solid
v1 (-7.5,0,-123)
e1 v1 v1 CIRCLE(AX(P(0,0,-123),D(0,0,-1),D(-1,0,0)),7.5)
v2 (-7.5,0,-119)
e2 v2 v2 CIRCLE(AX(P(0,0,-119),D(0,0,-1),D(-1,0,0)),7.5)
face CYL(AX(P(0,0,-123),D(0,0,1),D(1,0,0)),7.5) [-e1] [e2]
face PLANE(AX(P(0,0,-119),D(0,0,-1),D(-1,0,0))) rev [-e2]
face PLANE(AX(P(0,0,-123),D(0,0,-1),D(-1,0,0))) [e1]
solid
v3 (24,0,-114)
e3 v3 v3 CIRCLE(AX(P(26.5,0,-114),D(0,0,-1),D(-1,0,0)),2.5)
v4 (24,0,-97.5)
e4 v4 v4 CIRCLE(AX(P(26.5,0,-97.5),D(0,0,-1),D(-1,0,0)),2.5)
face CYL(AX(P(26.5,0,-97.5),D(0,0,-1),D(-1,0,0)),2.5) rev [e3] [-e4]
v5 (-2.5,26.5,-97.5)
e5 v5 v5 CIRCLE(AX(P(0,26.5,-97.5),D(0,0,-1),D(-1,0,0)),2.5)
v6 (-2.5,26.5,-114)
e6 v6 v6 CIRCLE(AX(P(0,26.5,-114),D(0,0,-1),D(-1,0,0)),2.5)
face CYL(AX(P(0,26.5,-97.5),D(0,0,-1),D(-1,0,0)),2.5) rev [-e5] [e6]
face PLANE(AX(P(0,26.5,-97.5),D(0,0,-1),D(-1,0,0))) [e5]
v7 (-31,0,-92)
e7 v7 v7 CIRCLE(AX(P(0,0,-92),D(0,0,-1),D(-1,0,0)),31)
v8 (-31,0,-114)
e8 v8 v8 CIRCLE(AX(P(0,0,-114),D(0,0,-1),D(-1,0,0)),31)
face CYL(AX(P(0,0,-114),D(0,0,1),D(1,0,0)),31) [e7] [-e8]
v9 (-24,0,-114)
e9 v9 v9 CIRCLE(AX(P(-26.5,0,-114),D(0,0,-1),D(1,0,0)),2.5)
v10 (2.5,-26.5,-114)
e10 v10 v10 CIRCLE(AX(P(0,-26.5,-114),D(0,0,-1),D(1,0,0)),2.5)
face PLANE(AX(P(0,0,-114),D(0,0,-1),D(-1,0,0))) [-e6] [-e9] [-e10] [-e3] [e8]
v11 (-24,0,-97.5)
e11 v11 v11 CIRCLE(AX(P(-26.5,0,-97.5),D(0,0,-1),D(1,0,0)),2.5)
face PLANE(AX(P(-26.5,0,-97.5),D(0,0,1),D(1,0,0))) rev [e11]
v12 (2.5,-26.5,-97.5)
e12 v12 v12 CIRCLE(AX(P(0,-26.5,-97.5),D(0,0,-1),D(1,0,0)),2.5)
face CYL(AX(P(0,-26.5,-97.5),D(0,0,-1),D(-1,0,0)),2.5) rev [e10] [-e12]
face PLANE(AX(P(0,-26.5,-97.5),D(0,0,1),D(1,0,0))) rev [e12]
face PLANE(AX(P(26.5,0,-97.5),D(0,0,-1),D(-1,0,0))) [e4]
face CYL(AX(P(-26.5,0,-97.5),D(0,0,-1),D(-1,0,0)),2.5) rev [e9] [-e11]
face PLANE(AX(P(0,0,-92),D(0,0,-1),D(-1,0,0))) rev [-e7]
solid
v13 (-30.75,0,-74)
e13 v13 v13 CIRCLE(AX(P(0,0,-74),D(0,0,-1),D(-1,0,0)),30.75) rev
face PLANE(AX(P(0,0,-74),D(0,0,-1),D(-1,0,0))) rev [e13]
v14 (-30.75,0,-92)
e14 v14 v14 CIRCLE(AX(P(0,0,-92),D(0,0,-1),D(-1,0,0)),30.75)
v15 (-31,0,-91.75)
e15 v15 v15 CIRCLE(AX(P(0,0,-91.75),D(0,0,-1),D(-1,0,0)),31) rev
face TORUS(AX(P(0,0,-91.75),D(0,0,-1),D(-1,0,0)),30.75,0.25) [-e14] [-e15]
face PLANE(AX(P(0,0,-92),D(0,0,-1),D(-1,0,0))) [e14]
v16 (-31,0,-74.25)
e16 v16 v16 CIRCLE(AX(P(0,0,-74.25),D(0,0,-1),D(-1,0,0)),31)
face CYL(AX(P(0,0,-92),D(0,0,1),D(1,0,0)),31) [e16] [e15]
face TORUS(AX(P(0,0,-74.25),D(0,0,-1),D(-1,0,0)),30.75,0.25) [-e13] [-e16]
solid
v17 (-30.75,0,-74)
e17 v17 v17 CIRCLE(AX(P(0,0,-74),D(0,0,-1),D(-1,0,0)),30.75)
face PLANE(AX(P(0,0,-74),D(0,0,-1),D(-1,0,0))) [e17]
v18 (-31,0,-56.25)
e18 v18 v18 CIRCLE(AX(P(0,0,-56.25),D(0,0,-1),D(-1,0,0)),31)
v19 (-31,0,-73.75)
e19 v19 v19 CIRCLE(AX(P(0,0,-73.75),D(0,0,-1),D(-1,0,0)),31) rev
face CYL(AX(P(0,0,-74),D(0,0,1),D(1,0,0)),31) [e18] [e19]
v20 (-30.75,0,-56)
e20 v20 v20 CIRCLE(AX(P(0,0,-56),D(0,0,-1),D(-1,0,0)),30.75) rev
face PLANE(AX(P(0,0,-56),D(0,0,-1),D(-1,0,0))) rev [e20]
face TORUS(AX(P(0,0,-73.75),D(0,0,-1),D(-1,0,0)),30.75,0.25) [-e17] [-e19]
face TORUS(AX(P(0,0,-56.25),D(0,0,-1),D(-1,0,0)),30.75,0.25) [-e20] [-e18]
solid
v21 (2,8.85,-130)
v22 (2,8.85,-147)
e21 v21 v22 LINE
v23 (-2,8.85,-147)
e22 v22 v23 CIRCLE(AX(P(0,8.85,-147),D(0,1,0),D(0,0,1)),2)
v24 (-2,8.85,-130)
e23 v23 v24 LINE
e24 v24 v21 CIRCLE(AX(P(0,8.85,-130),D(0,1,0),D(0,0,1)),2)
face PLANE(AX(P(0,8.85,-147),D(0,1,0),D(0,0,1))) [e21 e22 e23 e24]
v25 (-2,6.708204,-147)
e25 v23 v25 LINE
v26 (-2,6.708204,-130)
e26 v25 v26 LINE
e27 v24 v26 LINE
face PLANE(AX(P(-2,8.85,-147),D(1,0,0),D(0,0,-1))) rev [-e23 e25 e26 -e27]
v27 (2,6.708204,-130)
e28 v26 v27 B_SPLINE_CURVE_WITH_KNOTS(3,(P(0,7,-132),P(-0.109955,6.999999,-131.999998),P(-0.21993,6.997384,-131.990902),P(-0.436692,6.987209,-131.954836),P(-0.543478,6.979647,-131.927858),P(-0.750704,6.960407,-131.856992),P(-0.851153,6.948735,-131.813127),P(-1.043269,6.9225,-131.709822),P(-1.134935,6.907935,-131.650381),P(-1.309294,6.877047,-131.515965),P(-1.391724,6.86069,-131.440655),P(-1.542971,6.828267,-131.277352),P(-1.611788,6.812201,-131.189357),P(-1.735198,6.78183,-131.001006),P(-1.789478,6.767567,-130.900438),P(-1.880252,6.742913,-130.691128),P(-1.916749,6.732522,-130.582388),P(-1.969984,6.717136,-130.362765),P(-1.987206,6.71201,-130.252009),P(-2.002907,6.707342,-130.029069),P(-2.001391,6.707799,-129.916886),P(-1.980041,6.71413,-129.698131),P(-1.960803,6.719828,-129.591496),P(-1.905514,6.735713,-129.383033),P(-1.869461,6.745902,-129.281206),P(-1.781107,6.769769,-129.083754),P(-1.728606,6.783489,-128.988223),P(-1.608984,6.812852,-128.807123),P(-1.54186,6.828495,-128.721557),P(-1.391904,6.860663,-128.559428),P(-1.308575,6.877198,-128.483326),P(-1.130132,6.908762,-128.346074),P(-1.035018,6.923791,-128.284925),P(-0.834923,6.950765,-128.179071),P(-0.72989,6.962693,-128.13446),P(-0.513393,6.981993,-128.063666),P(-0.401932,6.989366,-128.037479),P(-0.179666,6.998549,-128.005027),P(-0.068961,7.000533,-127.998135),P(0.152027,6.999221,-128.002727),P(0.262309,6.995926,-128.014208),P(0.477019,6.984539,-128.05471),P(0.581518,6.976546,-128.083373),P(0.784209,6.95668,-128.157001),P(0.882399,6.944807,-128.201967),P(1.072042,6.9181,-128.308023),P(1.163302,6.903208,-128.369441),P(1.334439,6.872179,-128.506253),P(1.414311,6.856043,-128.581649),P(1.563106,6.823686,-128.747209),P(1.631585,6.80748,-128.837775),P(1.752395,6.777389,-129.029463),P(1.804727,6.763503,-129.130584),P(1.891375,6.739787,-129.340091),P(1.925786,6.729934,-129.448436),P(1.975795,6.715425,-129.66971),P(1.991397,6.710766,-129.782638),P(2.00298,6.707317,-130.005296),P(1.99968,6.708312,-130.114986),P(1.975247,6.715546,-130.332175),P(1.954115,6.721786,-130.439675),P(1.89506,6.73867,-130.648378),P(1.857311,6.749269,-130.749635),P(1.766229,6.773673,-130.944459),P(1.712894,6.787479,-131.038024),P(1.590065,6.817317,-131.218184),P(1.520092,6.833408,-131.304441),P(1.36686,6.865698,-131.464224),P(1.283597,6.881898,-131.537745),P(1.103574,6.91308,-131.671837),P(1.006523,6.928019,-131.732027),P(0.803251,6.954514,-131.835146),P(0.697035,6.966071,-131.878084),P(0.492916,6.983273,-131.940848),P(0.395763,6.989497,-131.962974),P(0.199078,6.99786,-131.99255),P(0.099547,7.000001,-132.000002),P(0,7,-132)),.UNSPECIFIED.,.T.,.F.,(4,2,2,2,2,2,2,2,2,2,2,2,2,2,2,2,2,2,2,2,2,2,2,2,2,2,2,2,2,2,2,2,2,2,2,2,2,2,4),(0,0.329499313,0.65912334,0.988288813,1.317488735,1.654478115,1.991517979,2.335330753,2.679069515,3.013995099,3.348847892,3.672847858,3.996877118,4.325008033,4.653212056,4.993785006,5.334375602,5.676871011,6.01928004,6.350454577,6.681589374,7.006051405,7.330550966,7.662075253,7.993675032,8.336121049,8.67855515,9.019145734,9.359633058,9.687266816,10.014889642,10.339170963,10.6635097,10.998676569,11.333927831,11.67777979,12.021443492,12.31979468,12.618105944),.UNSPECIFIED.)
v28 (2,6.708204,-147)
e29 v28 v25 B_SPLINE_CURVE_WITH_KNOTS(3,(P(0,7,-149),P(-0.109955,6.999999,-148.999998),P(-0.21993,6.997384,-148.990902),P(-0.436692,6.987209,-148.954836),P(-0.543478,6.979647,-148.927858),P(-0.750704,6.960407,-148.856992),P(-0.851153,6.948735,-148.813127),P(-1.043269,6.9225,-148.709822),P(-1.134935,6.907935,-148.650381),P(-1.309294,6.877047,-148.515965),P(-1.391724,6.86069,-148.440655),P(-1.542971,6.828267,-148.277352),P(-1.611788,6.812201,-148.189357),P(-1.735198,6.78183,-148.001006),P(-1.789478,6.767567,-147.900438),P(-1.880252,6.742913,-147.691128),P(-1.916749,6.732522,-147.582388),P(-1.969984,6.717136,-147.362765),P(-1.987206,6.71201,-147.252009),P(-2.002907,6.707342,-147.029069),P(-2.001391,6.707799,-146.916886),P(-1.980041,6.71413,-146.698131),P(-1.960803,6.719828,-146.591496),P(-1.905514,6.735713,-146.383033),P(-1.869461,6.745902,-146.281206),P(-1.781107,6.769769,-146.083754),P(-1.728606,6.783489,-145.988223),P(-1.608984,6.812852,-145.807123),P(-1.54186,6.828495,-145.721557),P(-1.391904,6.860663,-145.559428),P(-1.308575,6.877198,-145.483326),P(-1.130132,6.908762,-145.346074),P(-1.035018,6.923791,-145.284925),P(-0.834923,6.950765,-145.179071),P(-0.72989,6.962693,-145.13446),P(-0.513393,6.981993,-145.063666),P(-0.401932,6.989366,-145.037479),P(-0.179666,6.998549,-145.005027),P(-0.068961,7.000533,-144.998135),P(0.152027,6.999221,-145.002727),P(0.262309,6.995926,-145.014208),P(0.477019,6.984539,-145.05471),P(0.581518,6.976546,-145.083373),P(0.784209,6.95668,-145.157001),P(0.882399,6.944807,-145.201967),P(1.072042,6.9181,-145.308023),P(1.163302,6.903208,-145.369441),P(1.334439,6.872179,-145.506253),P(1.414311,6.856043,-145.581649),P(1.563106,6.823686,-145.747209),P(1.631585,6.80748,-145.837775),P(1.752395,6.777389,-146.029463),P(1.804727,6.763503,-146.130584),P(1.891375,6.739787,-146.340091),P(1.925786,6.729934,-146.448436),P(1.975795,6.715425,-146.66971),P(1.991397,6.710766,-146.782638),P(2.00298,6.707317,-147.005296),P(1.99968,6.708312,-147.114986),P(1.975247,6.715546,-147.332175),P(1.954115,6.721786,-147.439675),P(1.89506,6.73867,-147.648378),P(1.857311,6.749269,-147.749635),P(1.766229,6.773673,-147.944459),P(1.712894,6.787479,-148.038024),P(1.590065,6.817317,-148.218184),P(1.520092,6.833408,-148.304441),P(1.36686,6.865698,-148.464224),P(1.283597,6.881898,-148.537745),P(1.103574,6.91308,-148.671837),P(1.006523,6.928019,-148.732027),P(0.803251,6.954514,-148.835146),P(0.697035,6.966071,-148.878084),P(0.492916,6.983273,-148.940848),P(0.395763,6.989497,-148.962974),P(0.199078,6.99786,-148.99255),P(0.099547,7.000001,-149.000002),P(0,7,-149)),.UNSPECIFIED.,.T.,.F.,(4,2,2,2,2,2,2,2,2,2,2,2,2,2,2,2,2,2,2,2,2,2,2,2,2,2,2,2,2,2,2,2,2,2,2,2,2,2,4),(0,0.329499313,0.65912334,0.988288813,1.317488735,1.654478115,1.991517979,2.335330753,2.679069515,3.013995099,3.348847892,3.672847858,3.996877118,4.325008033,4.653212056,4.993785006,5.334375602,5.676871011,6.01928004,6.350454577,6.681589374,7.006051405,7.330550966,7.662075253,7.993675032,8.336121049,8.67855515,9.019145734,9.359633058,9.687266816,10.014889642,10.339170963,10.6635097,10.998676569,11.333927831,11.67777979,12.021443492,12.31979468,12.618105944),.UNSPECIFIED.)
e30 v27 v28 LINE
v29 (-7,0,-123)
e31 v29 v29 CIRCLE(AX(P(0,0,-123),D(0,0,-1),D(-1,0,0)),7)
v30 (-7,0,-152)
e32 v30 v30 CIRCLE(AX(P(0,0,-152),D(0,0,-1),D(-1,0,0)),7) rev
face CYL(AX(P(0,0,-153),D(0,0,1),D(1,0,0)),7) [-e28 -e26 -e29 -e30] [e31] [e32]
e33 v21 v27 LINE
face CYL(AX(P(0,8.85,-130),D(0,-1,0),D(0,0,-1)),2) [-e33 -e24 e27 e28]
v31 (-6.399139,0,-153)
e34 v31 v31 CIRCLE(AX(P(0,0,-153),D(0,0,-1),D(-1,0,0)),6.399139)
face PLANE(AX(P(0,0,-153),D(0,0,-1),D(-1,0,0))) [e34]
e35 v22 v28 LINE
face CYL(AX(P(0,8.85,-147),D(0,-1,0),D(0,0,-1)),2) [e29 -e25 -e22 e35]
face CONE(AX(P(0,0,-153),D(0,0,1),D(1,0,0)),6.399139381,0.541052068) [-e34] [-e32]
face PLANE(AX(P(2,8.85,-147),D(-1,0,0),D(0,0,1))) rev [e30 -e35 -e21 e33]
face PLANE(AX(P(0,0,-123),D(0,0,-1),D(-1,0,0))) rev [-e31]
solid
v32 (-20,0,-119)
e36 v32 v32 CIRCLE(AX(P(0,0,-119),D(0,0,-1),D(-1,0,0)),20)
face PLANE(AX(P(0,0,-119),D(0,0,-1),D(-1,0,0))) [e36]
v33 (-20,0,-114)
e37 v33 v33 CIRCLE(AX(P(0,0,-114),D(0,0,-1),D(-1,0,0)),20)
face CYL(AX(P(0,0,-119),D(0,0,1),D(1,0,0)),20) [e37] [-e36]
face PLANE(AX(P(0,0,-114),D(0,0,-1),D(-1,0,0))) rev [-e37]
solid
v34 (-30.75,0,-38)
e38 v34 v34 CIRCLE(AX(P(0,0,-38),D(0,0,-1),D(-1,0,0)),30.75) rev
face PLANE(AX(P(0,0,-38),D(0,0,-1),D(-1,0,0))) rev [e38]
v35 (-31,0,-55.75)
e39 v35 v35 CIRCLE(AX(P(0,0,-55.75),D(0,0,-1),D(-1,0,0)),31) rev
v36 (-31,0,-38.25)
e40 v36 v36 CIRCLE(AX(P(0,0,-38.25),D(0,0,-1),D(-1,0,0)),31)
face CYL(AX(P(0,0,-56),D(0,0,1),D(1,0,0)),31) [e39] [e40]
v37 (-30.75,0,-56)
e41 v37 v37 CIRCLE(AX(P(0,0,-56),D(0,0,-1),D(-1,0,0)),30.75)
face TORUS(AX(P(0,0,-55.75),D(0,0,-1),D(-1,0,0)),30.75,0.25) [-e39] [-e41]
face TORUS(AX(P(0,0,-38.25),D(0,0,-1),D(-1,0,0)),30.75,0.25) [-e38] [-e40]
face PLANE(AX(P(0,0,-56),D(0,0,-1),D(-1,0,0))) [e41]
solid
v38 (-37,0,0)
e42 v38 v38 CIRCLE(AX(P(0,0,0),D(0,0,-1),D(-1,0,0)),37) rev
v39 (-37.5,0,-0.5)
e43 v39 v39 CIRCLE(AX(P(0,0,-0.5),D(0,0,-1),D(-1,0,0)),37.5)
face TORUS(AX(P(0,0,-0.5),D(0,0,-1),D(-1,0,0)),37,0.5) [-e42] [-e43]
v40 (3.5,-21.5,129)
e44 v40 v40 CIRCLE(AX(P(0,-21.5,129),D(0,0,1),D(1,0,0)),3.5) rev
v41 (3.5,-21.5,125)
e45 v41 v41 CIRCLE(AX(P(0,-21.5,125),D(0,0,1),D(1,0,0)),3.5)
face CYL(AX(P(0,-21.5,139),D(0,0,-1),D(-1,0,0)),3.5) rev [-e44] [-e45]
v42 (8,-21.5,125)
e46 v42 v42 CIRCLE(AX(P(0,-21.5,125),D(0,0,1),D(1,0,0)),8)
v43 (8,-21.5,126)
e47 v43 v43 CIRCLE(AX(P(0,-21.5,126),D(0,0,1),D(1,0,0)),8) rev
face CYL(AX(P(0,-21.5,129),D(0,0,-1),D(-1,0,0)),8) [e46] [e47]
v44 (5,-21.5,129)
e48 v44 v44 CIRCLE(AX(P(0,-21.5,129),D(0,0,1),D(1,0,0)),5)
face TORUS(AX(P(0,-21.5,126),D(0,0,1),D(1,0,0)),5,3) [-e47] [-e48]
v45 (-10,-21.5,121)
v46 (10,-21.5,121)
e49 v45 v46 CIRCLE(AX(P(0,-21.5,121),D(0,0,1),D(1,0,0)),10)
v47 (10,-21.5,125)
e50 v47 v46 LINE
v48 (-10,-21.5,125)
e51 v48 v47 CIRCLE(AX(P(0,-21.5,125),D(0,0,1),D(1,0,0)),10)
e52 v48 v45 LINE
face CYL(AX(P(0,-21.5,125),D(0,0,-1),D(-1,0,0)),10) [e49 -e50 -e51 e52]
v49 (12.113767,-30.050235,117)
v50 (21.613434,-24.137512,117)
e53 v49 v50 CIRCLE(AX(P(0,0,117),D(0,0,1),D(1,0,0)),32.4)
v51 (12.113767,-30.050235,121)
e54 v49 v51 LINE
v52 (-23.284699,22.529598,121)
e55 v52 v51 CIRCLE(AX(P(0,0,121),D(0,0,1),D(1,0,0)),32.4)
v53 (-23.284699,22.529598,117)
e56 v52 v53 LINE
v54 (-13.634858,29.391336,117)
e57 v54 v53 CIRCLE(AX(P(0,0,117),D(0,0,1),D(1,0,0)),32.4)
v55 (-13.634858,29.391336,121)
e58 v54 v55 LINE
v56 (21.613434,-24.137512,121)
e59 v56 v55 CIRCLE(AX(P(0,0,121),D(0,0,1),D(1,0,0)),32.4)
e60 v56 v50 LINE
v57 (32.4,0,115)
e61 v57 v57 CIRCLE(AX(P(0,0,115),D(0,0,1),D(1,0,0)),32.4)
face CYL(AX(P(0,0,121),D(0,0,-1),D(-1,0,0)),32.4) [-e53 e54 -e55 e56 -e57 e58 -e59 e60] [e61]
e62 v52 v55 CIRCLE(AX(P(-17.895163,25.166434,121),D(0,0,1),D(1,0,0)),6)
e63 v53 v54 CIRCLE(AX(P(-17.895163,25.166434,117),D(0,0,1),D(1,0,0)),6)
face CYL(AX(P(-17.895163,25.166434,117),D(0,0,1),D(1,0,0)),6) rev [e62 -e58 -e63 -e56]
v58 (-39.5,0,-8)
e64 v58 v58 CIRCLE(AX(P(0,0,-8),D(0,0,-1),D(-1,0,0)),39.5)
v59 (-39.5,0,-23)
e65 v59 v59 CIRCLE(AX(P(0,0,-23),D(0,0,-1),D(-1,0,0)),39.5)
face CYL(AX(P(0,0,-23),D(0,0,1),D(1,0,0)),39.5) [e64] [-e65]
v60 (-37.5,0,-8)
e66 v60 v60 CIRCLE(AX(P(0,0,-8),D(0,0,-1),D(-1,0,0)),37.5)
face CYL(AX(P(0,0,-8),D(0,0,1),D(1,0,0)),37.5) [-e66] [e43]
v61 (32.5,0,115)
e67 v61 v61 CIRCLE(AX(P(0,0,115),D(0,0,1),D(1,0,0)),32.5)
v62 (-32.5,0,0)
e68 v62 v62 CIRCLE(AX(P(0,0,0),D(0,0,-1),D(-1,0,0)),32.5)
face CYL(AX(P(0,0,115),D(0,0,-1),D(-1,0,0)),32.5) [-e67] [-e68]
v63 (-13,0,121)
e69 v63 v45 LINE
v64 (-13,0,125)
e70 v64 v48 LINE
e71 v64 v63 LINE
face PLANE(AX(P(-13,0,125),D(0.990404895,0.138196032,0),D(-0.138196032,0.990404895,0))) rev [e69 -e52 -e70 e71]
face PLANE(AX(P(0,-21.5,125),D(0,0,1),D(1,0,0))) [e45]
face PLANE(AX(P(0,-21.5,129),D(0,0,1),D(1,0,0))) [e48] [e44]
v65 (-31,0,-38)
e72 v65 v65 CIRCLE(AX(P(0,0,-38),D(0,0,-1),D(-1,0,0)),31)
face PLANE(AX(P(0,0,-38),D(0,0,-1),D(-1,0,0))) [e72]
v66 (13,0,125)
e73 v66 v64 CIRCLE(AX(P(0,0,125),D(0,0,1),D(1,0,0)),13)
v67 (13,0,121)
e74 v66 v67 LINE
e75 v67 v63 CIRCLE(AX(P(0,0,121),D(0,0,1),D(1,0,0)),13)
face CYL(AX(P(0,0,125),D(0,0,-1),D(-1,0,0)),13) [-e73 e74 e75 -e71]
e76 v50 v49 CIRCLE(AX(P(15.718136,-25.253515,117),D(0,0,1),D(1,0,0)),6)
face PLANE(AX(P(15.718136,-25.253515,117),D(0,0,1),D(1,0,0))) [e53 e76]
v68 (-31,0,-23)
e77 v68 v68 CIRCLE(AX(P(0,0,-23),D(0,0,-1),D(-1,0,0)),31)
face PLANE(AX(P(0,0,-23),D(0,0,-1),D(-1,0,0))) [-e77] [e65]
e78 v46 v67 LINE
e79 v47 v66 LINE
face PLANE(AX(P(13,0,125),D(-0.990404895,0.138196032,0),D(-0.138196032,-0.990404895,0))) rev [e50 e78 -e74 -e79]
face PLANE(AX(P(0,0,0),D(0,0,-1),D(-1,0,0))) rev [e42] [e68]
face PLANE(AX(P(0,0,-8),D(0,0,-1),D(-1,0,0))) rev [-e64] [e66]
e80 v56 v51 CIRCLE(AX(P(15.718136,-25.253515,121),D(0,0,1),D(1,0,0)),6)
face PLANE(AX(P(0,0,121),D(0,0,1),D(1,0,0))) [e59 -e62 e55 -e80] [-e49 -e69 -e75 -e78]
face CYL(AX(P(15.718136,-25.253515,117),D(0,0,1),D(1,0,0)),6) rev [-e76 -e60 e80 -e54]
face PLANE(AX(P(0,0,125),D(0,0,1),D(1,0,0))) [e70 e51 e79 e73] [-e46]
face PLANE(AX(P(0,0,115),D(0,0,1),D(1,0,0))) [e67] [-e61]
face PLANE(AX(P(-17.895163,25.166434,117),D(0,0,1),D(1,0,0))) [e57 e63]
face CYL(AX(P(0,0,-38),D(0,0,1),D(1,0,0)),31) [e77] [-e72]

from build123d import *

# Parameters (mm, degrees)
SKETCH_1_R           = 32.5
EXTRUDE_1_DEPTH      = 115
SKETCH_2_R           = 32.4
EXTRUDE_2_DEPTH      = 6
EXTRUDE_3_DEPTH      = 4
SKETCH_5_R           = 8
EXTRUDE_4_DEPTH      = 4
FILLET_1_R           = 3
SKETCH_6_R           = 3.5
CUT_EXTRUDE_5_DEPTH  = 14
SKETCH_7_R           = 6
CUT_EXTRUDE_6_DEPTH  = 4
SKETCH_8_R           = 37.5
EXTRUDE_7_DEPTH      = 8
FILLET_4_R           = 0.5
SKETCH_9_R           = 39.5
EXTRUDE_8_DEPTH      = 15
SKETCH_10_R          = 31
EXTRUDE_9_DEPTH      = 15
SKETCH_13_R          = 31
EXTRUDE_12_DEPTH     = 18
SKETCH_14_R          = 31
EXTRUDE_14_DEPTH     = 18
FILLET_5_R           = 0.25
FILLET_7_R           = 0.25
FILLET_8_R           = 0.25
SKETCH_15_R          = 31
EXTRUDE_16_DEPTH     = 18
FILLET_9_R           = 0.25
FILLET_10_R          = 0.25
SKETCH_16_R          = 31
EXTRUDE_18_DEPTH     = 22
FILLET_11_R          = 0.25
SKETCH_17_R          = 20
EXTRUDE_19_DEPTH     = 5
SKETCH_18_R          = 7.5
EXTRUDE_20_DEPTH     = 4
SKETCH_19_R          = 7
EXTRUDE_21_DEPTH     = 30
CHAMFER_1_SIZE       = 1
CHAMFER_1_SIZE2      = 0.600860619
SKETCH_21_R          = 2.5
CUT_EXTRUDE_23_DEPTH = 16.5
EXTRUDE_START        = 6
EXTRUDE_27_DEPTH     = 2.85


with BuildPart() as part:
    # Эскиз1 → Вытянуть1 (new body)
    with BuildSketch(Plane.XY):
        Circle(SKETCH_1_R)
    extrude(amount=EXTRUDE_1_DEPTH)

    # Эскиз2 → Вытянуть2 (add)
    with BuildSketch(Plane.XY.offset(115)):
        Circle(SKETCH_2_R)
    extrude(amount=EXTRUDE_2_DEPTH)

    # Эскиз3 → Вытянуть3 (add)
    with BuildSketch(Plane.XY.offset(121)):
        with BuildLine():
            Line((-13, 0), (-10, -21.5))
            ThreePointArc((-10, -21.5), (0, -31.5), (10, -21.5))
            Line((10, -21.5), (13, 0))
            ThreePointArc((13, 0), (0, 13), (-13, 0))
        make_face()
    extrude(amount=EXTRUDE_3_DEPTH)

    # Эскиз5 → Вытянуть4 (add)
    with BuildSketch(Plane.XY.offset(125)):
        with Locations((0, -21.5)):
            Circle(SKETCH_5_R)
    extrude(amount=EXTRUDE_4_DEPTH)

    # Скругление1
    fillet_1_edges = [part.edges().sort_by_distance(p)[0] for p in [
        (-8, -21.5, 129),
    ]]
    fillet(fillet_1_edges, radius=FILLET_1_R)

    # Эскиз6 → Вытянуть5 (cut)
    with BuildSketch(Plane.XY.offset(125)):
        with Locations((0, -21.5)):
            Circle(SKETCH_6_R)
    extrude(amount=CUT_EXTRUDE_5_DEPTH, mode=Mode.SUBTRACT)

    # Эскиз7 → Вытянуть6 (cut)
    with BuildSketch(Plane.XY.offset(121)):
        with Locations((15.718136309, -25.2535154)):
            Circle(SKETCH_7_R)
        with Locations((-17.895163499, 25.166434312)):
            Circle(SKETCH_7_R)
    extrude(amount=-CUT_EXTRUDE_6_DEPTH, mode=Mode.SUBTRACT)

    # Эскиз8 → Вытянуть7 (add)
    with BuildSketch(Plane(origin=(0, 0, 0), x_dir=(-1, 0, 0), z_dir=(0, 0, -1))):
        Circle(SKETCH_8_R)
    extrude(amount=EXTRUDE_7_DEPTH)

    # Скругление4
    fillet_4_edges = [part.edges().sort_by_distance(p)[0] for p in [
        (37.5, 0, 0),
    ]]
    fillet(fillet_4_edges, radius=FILLET_4_R)

    # Эскиз9 → Вытянуть8 (add)
    with BuildSketch(Plane(origin=(0, 0, -8), x_dir=(-1, 0, 0), z_dir=(0, 0, -1))):
        Circle(SKETCH_9_R)
    extrude(amount=EXTRUDE_8_DEPTH)

    # Эскиз10 → Вытянуть9 (add)
    with BuildSketch(Plane(origin=(0, 0, -23), x_dir=(-1, 0, 0), z_dir=(0, 0, -1))):
        Circle(SKETCH_10_R)
    extrude(amount=EXTRUDE_9_DEPTH)


with BuildPart() as body_2:
    # Эскиз13 → Вытянуть12 (new body)
    with BuildSketch(Plane(origin=(0, 0, -38), x_dir=(-1, 0, 0), z_dir=(0, 0, -1))):
        Circle(SKETCH_13_R)
    extrude(amount=EXTRUDE_12_DEPTH)

    # Скругление5
    fillet_5_edges = [body_2.edges().sort_by_distance(p)[0] for p in [
        (31, 0, -38),
    ]]
    fillet(fillet_5_edges, radius=FILLET_5_R)

    # Скругление7
    fillet_7_edges = [body_2.edges().sort_by_distance(p)[0] for p in [
        (31, 0, -56),
    ]]
    fillet(fillet_7_edges, radius=FILLET_7_R)


with BuildPart() as body_3:
    # Эскиз14 → Вытянуть14 (new body)
    with BuildSketch(Plane(origin=(0, 0, -56), x_dir=(-1, 0, 0), z_dir=(0, 0, -1))):
        Circle(SKETCH_14_R)
    extrude(amount=EXTRUDE_14_DEPTH)

    # Скругление8
    fillet_8_edges = [body_3.edges().sort_by_distance(p)[0] for p in [
        (31, 0, -56),
    ]]
    fillet(fillet_8_edges, radius=FILLET_8_R)

    # Скругление9
    fillet_9_edges = [body_3.edges().sort_by_distance(p)[0] for p in [
        (31, 0, -74),
    ]]
    fillet(fillet_9_edges, radius=FILLET_9_R)


with BuildPart() as body_4:
    # Эскиз15 → Вытянуть16 (new body)
    with BuildSketch(Plane(origin=(0, 0, -74), x_dir=(-1, 0, 0), z_dir=(0, 0, -1))):
        Circle(SKETCH_15_R)
    extrude(amount=EXTRUDE_16_DEPTH)

    # Скругление10
    fillet_10_edges = [body_4.edges().sort_by_distance(p)[0] for p in [
        (31, 0, -74),
    ]]
    fillet(fillet_10_edges, radius=FILLET_10_R)

    # Скругление11
    fillet_11_edges = [body_4.edges().sort_by_distance(p)[0] for p in [
        (31, 0, -92),
    ]]
    fillet(fillet_11_edges, radius=FILLET_11_R)


with BuildPart() as body_5:
    # Эскиз16 → Вытянуть18 (new body)
    with BuildSketch(Plane(origin=(0, 0, -92), x_dir=(-1, 0, 0), z_dir=(0, 0, -1))):
        Circle(SKETCH_16_R)
    extrude(amount=EXTRUDE_18_DEPTH)

    # Эскиз21 → Вытянуть23 (cut)
    with BuildSketch(Plane(origin=(0, 0, -114), x_dir=(-1, 0, 0), z_dir=(0, 0, -1))):
        with Locations((0, 26.5)):
            Circle(SKETCH_21_R)
        with Locations(Location((0, -26.5, 0), (0, 0, 180))):
            Circle(SKETCH_21_R)
        with Locations((-26.5, 0)):
            Circle(SKETCH_21_R)
        with Locations(Location((26.5, 0, 0), (0, 0, 180))):
            Circle(SKETCH_21_R)
    extrude(amount=-CUT_EXTRUDE_23_DEPTH, mode=Mode.SUBTRACT)


with BuildPart() as body_6:
    # Эскиз17 → Вытянуть19 (new body)
    with BuildSketch(Plane(origin=(0, 0, -114), x_dir=(-1, 0, 0), z_dir=(0, 0, -1))):
        Circle(SKETCH_17_R)
    extrude(amount=EXTRUDE_19_DEPTH)


with BuildPart() as body_7:
    # Эскиз18 → Вытянуть20 (new body)
    with BuildSketch(Plane(origin=(0, 0, -119), x_dir=(-1, 0, 0), z_dir=(0, 0, -1))):
        Circle(SKETCH_18_R)
    extrude(amount=EXTRUDE_20_DEPTH)


with BuildPart() as body_8:
    # Эскиз19 → Вытянуть21 (new body)
    with BuildSketch(Plane(origin=(0, 0, -123), x_dir=(-1, 0, 0), z_dir=(0, 0, -1))):
        Circle(SKETCH_19_R)
    extrude(amount=EXTRUDE_21_DEPTH)

    # Фаска1
    chamfer_1_edges = [body_8.edges().sort_by_distance(p)[0] for p in [
        (7, 0, -153),
    ]]
    chamfer_1_side = [body_8.faces().sort_by_distance(p)[0] for p in [
        (7, 0, -138),
    ]]
    chamfer(chamfer_1_edges, length=CHAMFER_1_SIZE, length2=CHAMFER_1_SIZE2, reference=chamfer_1_side[0])

    # Эскиз20 → Вытянуть27 (add)
    with BuildSketch(Plane(origin=(0, 0, 0), x_dir=(1, 0, 0), z_dir=(0, 1, 0)).offset(EXTRUDE_START)):
        with BuildLine():
            Line((-2, 147), (-2, 130))
            ThreePointArc((-2, 130), (0, 128), (2, 130))
            Line((2, 130), (2, 147))
            ThreePointArc((2, 147), (0, 149), (-2, 147))
        make_face()
    extrude(amount=EXTRUDE_27_DEPTH)


solid = Compound([part.part, body_2.part, body_3.part, body_4.part, body_5.part, body_6.part, body_7.part, body_8.part])
